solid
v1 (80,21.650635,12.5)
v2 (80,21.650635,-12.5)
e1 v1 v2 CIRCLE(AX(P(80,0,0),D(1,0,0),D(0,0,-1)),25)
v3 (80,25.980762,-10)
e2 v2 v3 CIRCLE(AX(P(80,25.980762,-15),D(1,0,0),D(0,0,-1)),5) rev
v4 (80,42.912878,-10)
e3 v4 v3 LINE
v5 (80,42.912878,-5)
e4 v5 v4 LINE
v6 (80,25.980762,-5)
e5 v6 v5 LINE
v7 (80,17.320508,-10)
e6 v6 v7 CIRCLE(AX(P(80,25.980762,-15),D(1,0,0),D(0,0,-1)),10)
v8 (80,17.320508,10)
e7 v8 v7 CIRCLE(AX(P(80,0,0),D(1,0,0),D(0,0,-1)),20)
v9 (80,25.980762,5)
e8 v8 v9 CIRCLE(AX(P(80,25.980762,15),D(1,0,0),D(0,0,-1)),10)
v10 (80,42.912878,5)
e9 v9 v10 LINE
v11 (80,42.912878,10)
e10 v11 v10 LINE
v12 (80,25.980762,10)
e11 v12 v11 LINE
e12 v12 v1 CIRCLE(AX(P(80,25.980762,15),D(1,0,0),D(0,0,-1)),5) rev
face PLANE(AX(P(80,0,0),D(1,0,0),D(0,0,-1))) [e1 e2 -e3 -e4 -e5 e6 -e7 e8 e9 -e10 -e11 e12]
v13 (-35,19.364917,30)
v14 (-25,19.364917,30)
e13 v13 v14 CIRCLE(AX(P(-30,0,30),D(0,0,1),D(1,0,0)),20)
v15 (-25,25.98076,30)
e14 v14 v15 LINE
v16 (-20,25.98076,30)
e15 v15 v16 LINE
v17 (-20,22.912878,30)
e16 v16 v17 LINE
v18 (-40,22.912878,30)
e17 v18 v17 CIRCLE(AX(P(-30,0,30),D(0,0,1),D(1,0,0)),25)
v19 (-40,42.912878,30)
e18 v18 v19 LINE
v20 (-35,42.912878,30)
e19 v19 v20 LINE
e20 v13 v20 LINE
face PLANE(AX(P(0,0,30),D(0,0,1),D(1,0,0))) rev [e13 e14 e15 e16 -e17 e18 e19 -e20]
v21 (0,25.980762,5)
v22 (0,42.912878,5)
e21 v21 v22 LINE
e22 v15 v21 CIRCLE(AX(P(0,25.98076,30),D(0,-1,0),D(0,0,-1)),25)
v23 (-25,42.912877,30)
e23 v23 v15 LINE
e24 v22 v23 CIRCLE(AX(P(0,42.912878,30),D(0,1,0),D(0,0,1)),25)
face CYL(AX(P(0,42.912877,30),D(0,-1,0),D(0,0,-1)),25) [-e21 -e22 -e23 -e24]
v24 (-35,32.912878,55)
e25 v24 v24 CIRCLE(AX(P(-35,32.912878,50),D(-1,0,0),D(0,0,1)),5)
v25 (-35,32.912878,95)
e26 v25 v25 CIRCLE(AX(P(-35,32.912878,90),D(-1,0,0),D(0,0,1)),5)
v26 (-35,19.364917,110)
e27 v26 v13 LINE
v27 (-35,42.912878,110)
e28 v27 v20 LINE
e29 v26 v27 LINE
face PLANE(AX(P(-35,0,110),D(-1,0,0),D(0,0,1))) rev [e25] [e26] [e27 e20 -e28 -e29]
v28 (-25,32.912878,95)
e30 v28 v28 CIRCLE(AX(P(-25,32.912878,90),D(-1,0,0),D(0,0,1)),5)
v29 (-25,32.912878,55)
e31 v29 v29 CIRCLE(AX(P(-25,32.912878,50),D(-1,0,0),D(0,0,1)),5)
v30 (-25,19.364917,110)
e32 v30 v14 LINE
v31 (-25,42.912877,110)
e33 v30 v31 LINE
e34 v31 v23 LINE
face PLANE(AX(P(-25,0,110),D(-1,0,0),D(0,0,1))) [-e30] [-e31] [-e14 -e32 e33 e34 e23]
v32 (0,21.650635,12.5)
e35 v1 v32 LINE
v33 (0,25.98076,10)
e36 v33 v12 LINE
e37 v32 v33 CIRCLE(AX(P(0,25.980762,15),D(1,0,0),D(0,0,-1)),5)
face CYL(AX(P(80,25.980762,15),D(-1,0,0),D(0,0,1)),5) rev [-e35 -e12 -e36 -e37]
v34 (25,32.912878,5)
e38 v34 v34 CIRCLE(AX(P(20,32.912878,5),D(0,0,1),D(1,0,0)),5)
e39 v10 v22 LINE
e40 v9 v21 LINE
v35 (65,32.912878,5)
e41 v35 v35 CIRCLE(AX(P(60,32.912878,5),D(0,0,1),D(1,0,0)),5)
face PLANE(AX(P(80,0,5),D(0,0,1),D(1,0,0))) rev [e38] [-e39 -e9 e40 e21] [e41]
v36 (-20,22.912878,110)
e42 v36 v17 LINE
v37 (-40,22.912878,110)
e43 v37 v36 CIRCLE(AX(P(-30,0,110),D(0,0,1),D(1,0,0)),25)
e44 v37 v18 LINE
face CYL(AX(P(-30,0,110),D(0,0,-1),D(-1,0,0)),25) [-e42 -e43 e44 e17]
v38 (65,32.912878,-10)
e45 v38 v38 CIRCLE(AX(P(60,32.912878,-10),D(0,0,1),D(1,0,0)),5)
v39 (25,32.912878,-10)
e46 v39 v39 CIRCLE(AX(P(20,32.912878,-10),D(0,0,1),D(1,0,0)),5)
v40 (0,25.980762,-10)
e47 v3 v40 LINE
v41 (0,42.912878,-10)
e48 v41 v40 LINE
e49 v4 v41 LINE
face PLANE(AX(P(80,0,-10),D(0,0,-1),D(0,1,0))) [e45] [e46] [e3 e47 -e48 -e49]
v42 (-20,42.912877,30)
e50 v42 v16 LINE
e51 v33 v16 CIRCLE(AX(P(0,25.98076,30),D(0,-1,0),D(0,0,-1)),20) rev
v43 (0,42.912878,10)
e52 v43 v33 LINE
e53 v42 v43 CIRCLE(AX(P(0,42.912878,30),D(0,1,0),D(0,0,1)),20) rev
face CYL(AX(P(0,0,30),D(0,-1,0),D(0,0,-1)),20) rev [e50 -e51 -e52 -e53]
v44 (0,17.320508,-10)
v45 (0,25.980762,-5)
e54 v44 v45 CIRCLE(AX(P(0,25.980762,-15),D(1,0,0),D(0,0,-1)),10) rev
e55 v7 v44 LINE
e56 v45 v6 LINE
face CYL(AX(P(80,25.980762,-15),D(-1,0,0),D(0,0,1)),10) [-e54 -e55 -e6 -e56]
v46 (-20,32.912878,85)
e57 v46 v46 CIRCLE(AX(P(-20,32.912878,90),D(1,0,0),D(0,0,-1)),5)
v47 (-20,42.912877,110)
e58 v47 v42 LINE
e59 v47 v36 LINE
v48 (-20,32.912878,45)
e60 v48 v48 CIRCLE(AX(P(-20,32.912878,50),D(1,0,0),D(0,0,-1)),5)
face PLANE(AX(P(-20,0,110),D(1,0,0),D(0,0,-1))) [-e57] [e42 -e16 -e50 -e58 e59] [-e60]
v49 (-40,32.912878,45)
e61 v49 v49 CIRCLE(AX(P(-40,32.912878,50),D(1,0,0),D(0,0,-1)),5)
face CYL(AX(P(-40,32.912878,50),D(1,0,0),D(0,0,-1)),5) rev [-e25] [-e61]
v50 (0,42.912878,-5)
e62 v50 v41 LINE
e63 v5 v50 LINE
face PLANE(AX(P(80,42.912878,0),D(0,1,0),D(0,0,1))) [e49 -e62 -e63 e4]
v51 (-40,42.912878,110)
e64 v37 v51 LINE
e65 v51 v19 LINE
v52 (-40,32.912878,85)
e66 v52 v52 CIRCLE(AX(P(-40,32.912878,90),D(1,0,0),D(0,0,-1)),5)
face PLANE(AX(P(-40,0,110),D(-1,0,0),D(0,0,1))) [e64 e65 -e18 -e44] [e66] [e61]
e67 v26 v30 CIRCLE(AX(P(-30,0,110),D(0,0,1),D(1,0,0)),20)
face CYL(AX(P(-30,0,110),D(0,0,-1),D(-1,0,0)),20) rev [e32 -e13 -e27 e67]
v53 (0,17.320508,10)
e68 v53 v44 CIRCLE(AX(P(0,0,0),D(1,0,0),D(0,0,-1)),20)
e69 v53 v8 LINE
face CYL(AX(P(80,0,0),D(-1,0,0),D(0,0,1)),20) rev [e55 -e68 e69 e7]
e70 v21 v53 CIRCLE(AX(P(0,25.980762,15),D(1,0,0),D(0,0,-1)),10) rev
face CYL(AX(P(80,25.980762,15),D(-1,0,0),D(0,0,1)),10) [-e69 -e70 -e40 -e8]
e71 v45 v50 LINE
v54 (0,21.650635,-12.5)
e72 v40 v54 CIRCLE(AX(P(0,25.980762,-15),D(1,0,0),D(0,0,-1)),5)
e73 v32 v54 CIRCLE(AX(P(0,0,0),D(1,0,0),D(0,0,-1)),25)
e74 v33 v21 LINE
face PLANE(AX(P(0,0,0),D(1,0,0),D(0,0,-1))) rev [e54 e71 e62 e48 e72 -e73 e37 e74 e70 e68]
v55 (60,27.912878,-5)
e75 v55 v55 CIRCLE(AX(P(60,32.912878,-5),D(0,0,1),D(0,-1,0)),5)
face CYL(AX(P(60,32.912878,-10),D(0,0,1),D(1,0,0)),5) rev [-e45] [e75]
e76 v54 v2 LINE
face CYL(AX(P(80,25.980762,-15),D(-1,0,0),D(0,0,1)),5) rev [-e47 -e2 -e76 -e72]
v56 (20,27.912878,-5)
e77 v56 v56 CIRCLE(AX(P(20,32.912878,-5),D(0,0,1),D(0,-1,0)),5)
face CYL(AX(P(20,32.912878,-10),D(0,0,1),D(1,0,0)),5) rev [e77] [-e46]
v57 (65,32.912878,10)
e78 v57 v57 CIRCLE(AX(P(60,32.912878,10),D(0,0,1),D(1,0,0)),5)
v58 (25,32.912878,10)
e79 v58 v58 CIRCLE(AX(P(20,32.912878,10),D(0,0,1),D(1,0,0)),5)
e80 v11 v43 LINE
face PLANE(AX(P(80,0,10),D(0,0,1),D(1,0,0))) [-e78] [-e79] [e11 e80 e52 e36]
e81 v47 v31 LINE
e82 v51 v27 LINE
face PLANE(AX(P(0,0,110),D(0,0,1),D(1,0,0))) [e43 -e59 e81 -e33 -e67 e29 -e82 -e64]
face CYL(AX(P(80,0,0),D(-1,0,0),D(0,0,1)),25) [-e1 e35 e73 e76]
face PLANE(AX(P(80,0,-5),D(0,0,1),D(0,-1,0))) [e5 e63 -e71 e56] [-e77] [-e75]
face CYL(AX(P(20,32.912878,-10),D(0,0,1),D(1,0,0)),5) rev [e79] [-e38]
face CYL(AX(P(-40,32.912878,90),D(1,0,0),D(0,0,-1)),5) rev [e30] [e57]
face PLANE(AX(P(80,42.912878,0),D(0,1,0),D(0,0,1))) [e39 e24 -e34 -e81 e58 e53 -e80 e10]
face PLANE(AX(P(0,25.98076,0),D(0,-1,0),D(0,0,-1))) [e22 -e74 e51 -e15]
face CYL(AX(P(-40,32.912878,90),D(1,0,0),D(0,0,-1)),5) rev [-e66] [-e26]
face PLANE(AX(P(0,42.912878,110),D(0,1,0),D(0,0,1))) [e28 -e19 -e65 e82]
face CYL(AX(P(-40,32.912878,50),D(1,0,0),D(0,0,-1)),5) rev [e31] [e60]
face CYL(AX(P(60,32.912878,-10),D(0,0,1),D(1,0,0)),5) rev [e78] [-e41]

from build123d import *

# Parameters (mm, degrees)
BOSS_EXTRUDE1_DEPTH = 80
SKETCH2_R           = 5
CUT_EXTRUDE1_DEPTH  = 10
FILLET2_R           = 5
FILLET3_R           = 10
BOSS_EXTRUDE2_START = 25.98076
BOSS_EXTRUDE2_DEPTH = 16.932117
FILLET4_R           = 20
FILLET5_R           = 25
SKETCH6_W           = 5
SKETCH6_H           = 16.932118475
BOSS_EXTRUDE4_DEPTH = 80
SKETCH7_R           = 5
CUT_EXTRUDE2_DEPTH  = 40


with BuildPart() as part:
    # Sketch1 → Boss-Extrude1 (new body)
    with BuildSketch(Plane(origin=(0, 0, 0), x_dir=(0, 0, -1), z_dir=(1, 0, 0))):
        with BuildLine():
            Line((-10, 22.912878475), (-10, 42.912878475))
            Line((-10, 42.912878475), (-5, 42.912878475))
            Line((-5, 42.912878475), (-5, 19.364916731))
            ThreePointArc((-5, 19.364916731), (0, -20), (5, 19.364916731))
            Line((5, 19.364916731), (5, 42.912878475))
            Line((5, 42.912878475), (10, 42.912878475))
            Line((10, 42.912878475), (10, 22.912878475))
            ThreePointArc((10, 22.912878475), (0, -25), (-10, 22.912878475))
        make_face()
    extrude(amount=BOSS_EXTRUDE1_DEPTH)

    # Sketch2 → Cut-Extrude1 (cut, symmetric)
    with BuildSketch(Plane.XY):
        with Locations((20, 32.912878475)):
            Circle(SKETCH2_R)
        with Locations((60, 32.912878475)):
            Circle(SKETCH2_R)
    extrude(amount=CUT_EXTRUDE1_DEPTH, both=True, mode=Mode.SUBTRACT)

    # Fillet2
    fillet2_edges = [part.edges().sort_by_distance(p)[0] for p in [
        (40, 22.912878475, -10),
        (40, 22.912878475, 10),
    ]]
    fillet(fillet2_edges, radius=FILLET2_R)

    # Fillet3
    fillet3_edges = [part.edges().sort_by_distance(p)[0] for p in [
        (40, 19.364916731, 5),
        (40, 19.364916731, -5),
    ]]
    fillet(fillet3_edges, radius=FILLET3_R)

    # Sketch3 → Boss-Extrude2 (add)
    with BuildSketch(Plane(origin=(0, 0, 0), x_dir=(1, 0, 0), z_dir=(0, 1, 0)).offset(BOSS_EXTRUDE2_START)):
        Polygon((0, -10), (-20, -10), (-20, -30), (-25, -30), (-25, -5), (0, -5), align=None)
    extrude(amount=BOSS_EXTRUDE2_DEPTH)

    # Fillet4
    fillet4_edges = [part.edges().sort_by_distance(p)[0] for p in [
        (-20, 34.4468185, 10),
    ]]
    fillet(fillet4_edges, radius=FILLET4_R - 0.0001)  # a hair under: the kernel refuses the full size

    # Fillet5
    fillet5_edges = [part.edges().sort_by_distance(p)[0] for p in [
        (-25, 34.4468185, 5),
    ]]
    fillet(fillet5_edges, radius=FILLET5_R - 0.0001)  # a hair under: the kernel refuses the full size

    # Sketch6 → Boss-Extrude4 (add)
    with BuildSketch(Plane.XY.offset(30)):
        with BuildLine():
            Line((-20, 25.98076), (-25, 25.98076))
            Line((-25, 25.98076), (-25, 19.364916731))
            ThreePointArc((-25, 19.364916731), (-30, -20), (-35, 19.364916731))
            Line((-35, 19.364916731), (-35, 42.912878475))
            Line((-35, 42.912878475), (-40, 42.912878475))
            Line((-40, 42.912878475), (-40, 22.912878475))
            ThreePointArc((-40, 22.912878475), (-30, -25), (-20, 22.912878475))
            Line((-20, 22.912878475), (-20, 25.98076))
        make_face()
        with Locations((-22.5, 34.446819238)):
            Rectangle(SKETCH6_W, SKETCH6_H)
    extrude(amount=BOSS_EXTRUDE4_DEPTH)

    # Sketch7 → Cut-Extrude2 (cut)
    with BuildSketch(Plane(origin=(0, 0, 0), x_dir=(0, 0, -1), z_dir=(1, 0, 0))):
        with Locations((-90, 32.912878475)):
            Circle(SKETCH7_R)
        with Locations((-50, 32.912878475)):
            Circle(SKETCH7_R)
    extrude(amount=-CUT_EXTRUDE2_DEPTH, mode=Mode.SUBTRACT)


solid = part.part
